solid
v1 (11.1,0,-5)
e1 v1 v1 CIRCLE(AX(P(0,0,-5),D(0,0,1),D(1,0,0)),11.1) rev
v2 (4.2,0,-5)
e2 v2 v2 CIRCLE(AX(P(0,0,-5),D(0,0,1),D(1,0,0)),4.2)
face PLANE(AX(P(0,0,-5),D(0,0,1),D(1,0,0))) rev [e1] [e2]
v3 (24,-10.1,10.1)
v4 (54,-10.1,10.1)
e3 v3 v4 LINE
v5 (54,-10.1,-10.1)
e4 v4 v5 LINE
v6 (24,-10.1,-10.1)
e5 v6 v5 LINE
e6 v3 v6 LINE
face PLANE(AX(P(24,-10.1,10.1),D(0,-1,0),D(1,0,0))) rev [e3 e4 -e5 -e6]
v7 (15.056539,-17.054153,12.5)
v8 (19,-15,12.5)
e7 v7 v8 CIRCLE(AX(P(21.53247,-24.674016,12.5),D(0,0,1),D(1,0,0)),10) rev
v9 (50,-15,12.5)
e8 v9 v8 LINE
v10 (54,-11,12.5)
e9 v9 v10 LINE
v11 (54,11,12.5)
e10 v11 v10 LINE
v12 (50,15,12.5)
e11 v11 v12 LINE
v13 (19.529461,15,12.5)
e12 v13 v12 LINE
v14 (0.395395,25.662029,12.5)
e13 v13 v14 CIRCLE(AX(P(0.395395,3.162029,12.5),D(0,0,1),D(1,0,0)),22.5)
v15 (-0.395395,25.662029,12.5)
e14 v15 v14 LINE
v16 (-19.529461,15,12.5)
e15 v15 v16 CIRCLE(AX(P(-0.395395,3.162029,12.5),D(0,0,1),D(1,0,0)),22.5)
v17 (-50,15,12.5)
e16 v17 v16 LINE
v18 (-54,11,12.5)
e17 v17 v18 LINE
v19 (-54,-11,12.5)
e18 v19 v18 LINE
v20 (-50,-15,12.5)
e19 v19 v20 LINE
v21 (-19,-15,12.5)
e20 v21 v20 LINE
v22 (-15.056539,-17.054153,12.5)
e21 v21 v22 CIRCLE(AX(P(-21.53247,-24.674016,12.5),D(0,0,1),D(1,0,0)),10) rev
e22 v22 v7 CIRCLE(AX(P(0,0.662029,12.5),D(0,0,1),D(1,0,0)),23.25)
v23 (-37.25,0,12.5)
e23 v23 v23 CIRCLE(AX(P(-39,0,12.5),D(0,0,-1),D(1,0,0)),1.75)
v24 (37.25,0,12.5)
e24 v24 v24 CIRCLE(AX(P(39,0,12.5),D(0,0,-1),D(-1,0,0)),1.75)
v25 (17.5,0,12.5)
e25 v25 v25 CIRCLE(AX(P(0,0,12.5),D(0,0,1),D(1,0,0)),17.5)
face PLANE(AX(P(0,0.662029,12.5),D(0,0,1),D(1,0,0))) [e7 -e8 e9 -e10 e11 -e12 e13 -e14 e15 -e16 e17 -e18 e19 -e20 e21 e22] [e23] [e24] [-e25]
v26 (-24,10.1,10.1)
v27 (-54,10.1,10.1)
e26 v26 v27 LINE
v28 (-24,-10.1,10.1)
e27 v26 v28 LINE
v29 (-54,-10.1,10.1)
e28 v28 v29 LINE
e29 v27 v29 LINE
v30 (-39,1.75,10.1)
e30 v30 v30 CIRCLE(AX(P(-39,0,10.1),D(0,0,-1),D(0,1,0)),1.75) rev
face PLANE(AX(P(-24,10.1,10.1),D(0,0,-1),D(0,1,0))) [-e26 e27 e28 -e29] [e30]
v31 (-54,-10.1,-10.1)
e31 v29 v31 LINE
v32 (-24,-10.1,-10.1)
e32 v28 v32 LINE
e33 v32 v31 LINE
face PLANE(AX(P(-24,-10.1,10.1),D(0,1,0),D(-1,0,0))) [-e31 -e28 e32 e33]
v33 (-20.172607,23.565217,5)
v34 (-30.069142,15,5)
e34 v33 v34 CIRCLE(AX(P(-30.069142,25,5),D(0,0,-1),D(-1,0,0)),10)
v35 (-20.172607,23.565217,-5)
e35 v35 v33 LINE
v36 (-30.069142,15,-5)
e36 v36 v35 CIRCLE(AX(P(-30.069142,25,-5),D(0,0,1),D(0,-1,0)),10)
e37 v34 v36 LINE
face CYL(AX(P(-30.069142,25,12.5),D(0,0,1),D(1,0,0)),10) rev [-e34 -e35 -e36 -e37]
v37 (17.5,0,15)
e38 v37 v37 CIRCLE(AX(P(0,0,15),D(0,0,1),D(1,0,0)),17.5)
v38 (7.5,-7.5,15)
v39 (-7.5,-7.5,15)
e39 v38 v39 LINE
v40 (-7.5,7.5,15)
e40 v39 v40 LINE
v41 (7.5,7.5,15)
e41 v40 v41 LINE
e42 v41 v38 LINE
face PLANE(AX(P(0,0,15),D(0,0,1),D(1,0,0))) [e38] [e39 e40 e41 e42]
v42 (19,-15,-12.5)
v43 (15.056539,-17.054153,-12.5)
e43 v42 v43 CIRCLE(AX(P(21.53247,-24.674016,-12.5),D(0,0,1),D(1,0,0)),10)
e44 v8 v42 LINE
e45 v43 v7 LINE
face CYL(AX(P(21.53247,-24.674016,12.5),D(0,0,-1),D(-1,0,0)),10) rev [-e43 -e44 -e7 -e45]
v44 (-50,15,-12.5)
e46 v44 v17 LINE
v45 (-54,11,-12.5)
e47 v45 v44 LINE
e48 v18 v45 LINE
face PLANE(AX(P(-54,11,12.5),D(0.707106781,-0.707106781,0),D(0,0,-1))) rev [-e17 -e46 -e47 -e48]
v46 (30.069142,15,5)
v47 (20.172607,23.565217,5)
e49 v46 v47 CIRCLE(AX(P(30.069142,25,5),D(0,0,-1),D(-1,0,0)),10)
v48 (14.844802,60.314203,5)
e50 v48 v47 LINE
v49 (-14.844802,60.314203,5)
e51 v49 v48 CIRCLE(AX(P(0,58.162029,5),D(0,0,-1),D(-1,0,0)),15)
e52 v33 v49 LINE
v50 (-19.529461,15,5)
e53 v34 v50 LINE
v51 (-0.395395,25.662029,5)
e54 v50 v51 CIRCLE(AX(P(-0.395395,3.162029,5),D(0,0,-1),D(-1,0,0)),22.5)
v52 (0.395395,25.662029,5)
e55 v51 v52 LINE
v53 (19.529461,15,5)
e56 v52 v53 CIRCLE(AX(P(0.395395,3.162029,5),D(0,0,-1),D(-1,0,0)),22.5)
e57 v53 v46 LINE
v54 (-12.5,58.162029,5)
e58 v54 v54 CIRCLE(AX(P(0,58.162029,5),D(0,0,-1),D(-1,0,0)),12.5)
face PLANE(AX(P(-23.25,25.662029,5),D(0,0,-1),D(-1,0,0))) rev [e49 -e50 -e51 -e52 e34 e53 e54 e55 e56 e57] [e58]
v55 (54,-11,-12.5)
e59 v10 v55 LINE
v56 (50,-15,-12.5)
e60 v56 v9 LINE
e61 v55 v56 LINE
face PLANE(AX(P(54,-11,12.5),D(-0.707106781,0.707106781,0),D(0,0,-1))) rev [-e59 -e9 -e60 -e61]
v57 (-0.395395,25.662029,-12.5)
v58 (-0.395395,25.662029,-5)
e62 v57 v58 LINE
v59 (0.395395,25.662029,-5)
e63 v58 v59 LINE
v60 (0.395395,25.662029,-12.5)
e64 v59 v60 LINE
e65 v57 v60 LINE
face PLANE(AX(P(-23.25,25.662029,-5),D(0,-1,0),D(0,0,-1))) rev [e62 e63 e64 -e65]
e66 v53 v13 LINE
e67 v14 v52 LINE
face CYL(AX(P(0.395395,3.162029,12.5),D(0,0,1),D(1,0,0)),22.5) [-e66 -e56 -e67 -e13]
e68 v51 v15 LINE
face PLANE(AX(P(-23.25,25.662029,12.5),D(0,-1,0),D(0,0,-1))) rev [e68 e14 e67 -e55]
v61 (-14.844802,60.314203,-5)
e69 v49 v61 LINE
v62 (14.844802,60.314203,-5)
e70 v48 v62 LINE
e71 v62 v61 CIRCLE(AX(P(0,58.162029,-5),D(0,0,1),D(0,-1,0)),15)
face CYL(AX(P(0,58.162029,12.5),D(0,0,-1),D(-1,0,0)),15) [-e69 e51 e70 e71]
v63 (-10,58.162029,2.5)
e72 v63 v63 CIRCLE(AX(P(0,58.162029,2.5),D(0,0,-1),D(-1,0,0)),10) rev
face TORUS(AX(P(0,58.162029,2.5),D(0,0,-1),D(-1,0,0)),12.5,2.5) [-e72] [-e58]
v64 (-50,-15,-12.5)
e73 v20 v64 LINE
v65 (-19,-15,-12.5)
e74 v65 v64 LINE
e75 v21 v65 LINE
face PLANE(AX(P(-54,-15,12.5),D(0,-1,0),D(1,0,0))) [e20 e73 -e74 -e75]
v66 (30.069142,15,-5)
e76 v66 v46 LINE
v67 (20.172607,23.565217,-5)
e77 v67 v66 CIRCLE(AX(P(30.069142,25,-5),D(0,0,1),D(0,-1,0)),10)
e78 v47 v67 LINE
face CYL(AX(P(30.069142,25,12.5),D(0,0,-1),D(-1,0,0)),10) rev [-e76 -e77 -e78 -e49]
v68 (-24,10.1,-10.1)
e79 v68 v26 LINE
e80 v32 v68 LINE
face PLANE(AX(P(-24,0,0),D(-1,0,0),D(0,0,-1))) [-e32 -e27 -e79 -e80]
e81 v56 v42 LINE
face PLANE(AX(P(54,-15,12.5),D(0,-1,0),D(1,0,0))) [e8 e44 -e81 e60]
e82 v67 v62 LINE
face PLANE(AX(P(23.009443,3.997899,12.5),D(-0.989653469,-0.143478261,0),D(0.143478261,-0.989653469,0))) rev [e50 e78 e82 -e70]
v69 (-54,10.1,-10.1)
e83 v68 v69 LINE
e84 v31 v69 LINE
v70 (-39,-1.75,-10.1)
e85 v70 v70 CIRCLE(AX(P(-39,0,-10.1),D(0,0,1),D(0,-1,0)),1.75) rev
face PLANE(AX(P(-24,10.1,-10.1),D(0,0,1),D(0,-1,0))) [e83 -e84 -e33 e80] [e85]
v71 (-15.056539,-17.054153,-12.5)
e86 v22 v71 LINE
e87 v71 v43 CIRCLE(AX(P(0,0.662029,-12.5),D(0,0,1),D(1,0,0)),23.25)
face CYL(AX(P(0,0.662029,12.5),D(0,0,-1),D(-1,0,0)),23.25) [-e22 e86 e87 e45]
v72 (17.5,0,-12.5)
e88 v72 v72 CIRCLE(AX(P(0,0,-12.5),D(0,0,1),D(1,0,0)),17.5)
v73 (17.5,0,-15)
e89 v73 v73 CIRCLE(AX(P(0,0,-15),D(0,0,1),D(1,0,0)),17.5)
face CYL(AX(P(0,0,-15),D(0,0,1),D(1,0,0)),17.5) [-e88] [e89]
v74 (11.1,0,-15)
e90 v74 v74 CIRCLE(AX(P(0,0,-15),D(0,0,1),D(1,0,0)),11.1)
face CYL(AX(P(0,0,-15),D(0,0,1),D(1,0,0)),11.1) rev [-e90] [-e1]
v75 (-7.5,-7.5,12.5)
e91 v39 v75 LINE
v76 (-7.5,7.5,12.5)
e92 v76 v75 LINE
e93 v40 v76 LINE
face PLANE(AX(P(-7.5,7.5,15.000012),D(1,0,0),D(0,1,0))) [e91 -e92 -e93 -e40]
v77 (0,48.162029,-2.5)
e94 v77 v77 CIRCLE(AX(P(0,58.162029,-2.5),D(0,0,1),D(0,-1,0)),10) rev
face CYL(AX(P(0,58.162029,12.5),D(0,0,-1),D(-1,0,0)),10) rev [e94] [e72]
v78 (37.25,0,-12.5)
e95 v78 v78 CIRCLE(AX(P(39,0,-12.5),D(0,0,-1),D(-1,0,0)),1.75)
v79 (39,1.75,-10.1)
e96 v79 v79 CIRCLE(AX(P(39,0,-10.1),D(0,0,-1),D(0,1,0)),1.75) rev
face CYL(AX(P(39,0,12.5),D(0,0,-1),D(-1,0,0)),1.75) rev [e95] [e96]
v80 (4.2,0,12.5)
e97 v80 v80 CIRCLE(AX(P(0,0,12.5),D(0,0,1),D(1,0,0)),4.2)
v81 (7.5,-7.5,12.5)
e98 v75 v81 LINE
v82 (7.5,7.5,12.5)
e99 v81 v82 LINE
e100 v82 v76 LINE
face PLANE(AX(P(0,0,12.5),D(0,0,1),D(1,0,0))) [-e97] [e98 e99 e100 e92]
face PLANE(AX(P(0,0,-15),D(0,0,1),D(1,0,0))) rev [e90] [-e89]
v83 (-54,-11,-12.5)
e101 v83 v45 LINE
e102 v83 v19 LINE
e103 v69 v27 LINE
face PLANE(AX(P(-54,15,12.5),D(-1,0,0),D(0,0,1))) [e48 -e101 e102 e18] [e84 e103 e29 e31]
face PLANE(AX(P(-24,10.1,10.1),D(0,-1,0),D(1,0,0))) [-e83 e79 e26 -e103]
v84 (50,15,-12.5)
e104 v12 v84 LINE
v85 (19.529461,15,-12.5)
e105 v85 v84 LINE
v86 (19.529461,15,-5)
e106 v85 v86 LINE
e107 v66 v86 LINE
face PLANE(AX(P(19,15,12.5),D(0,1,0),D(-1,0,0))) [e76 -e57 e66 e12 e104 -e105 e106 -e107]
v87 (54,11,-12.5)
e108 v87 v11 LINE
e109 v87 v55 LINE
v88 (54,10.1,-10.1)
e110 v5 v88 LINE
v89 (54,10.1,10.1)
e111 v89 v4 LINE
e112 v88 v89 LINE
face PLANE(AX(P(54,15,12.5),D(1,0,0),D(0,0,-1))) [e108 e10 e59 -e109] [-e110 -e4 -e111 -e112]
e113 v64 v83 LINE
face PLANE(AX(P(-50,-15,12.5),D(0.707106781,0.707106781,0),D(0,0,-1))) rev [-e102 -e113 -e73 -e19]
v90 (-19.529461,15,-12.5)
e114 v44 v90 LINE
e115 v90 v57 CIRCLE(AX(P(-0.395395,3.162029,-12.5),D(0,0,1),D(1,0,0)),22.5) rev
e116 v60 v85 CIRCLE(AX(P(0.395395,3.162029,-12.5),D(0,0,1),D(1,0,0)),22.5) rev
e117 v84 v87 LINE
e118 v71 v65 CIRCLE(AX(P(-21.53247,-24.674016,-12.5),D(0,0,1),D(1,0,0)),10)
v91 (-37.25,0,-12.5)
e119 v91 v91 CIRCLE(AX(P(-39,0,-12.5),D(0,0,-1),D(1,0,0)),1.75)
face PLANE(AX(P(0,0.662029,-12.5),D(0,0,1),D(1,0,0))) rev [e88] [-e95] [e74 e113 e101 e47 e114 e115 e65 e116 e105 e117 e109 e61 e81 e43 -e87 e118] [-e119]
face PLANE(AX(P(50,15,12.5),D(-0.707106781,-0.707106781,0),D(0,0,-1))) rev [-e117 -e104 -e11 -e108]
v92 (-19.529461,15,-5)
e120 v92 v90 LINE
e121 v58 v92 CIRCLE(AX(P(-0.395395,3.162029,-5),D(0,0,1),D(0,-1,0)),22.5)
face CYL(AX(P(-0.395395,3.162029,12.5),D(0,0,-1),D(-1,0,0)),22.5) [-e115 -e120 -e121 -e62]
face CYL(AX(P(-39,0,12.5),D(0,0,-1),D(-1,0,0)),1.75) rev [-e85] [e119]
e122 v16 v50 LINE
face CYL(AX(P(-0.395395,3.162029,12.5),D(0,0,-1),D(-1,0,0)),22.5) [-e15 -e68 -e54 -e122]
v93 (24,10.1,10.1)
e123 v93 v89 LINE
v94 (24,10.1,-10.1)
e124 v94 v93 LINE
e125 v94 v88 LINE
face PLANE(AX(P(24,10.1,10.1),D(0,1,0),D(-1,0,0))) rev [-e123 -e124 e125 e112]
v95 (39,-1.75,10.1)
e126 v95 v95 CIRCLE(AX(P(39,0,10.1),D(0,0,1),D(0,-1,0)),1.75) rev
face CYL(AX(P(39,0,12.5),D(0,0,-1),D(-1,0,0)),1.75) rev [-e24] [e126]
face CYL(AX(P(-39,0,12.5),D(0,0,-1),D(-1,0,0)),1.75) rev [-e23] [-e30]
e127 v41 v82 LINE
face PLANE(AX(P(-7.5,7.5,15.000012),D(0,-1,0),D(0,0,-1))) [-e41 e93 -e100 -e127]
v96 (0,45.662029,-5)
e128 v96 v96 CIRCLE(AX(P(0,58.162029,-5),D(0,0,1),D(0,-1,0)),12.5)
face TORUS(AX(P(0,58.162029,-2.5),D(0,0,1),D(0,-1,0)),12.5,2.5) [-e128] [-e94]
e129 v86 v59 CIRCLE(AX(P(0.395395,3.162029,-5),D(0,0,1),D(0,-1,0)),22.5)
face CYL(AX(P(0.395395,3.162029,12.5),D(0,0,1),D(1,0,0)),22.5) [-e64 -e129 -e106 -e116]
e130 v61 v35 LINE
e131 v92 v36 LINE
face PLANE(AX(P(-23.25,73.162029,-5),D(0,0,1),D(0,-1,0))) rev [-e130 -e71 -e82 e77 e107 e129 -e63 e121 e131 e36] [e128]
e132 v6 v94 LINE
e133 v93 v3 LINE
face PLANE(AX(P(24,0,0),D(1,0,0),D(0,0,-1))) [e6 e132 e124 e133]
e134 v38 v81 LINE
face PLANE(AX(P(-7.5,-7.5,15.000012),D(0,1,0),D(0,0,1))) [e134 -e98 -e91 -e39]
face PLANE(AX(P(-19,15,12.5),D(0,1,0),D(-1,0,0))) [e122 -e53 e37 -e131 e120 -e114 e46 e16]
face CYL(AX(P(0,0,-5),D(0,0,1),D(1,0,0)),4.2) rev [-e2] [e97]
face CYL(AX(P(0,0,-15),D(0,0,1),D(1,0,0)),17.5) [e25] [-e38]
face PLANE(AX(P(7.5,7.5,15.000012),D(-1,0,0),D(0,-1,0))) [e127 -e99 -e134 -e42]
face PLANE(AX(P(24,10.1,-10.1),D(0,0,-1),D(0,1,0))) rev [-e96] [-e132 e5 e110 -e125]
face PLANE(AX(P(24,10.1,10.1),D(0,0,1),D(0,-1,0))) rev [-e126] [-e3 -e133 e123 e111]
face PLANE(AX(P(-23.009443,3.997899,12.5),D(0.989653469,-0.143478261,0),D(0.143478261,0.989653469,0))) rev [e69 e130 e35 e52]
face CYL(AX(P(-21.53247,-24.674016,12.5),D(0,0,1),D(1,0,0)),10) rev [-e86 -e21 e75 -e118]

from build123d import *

# Parameters (mm, degrees)
CROQUIS1_R                   = 15
CROQUIS1_R_2                 = 10
SALIENTE_EXTRUIR1_DEPTH      = 12.5
CORTAR_EXTRUIR2_DEPTH        = 78.778499901
CORTAR_EXTRUIR2_DEPTH_BACK   = 78.778499901
CROQUIS3_W                   = 7.5
CROQUIS3_H                   = 47.5
REDONDEO3_R                  = 22.5
CROQUIS4_W                   = 35
CROQUIS4_H                   = 30
CROQUIS4_R                   = 1.75
SALIENTE_EXTRUIR2_DEPTH      = 25
CROQUIS5_W                   = 20.2
CROQUIS5_H                   = 20.2
CORTAR_EXTRUIR3_DEPTH        = 30
REDONDEO4_R                  = 10
CHAFL_N1_SIZE                = 4
REDONDEO6_R                  = 2.5
SALIENTE_EXTRUIR3_DEPTH      = 2.5
SALIENTE_EXTRUIR3_DEPTH_BACK = 27.5
CROQUIS6_R                   = 17.5
CROQUIS6_R_2                 = 11.1
CROQUIS8_R                   = 17.5
CROQUIS8_R_2                 = 4.2
SALIENTE_EXTRUIR4_DEPTH      = 20
CORTAR_EXTRUIR4_DEPTH        = 96.753237788
CORTAR_EXTRUIR4_DEPTH_BACK   = 2.5
CROQUIS9_W                   = 15
CROQUIS9_H                   = 15
CROQUIS9_R                   = 4.2


with BuildPart() as part:
    # Croquis1 → Saliente-Extruir1 (new, symmetric)
    with BuildSketch(Plane.XY):
        with BuildLine():
            Line((-23.009443154, 3.997898972), (-14.844802035, 60.31420332))
            ThreePointArc((-14.844802035, 60.31420332), (0, 73.162029407), (14.844802035, 60.31420332))
            Line((14.844802035, 60.31420332), (23.009443154, 3.997898972))
            ThreePointArc((23.009443154, 3.997898972), (0, -22.587970593), (-23.009443154, 3.997898972))
        make_face()
        Circle(CROQUIS1_R, mode=Mode.SUBTRACT)
        with Locations((0, 58.162029407)):
            Circle(CROQUIS1_R_2, mode=Mode.SUBTRACT)
    extrude(amount=SALIENTE_EXTRUIR1_DEPTH, both=True)

    # Croquis3 → Cortar-Extruir2 (cut, two sides: drawn at the far end of the back side and taken through both)
    with BuildSketch(Plane(origin=(0, 0, 0), x_dir=(0, 0, -1), z_dir=(1, 0, 0)).offset(-CORTAR_EXTRUIR2_DEPTH_BACK)):
        with Locations((8.75, 49.412029407)):
            Rectangle(CROQUIS3_W, CROQUIS3_H)
        with Locations((-8.75, 49.412029407)):
            Rectangle(CROQUIS3_W, CROQUIS3_H)
    extrude(amount=CORTAR_EXTRUIR2_DEPTH + CORTAR_EXTRUIR2_DEPTH_BACK, mode=Mode.SUBTRACT)

    # Redondeo3
    redondeo3_edges = [part.edges().sort_by_distance(p)[0] for p in [
        (-19.868614717, 25.662029407, 8.75),
        (-19.868614717, 25.662029407, -8.75),
        (19.868614717, 25.662029407, -8.75),
        (19.868614717, 25.662029407, 8.75),
    ]]
    fillet(redondeo3_edges, radius=REDONDEO3_R)

    # Croquis4 → Saliente-Extruir2 (add)
    # profile 1 of 2: a face of its own
    with BuildSketch(Plane(origin=(0, 0, -12.5), x_dir=(-1, 0, 0), z_dir=(0, 0, -1))):
        with Locations((-36.5, 0)):
            Rectangle(CROQUIS4_W, CROQUIS4_H)
        with Locations((-39, 0)):
            Circle(CROQUIS4_R, mode=Mode.SUBTRACT)
    # profile 2 of 2: a face of its own
    with BuildSketch(Plane(origin=(0, 0, -12.5), x_dir=(-1, 0, 0), z_dir=(0, 0, -1))):
        with Locations((36.5, 0)):
            Rectangle(CROQUIS4_W, CROQUIS4_H)
        with Locations(Location((39, 0, 0), (0, 0, 180))):
            Circle(CROQUIS4_R, mode=Mode.SUBTRACT)
    extrude(amount=-SALIENTE_EXTRUIR2_DEPTH)

    # Croquis5 → Cortar-Extruir3 (cut)
    with BuildSketch(Plane(origin=(54, 0, 0), x_dir=(0, 0, -1), z_dir=(1, 0, 0))):
        Rectangle(CROQUIS5_W, CROQUIS5_H)
    cortar_extruir3 = extrude(amount=-CORTAR_EXTRUIR3_DEPTH, mode=Mode.SUBTRACT)

    # Simetría1: Cortar-Extruir3 across plane
    add(cortar_extruir3.mirror(Plane(origin=(0, 0, 0), x_dir=(0, 0, 1), z_dir=(1, 0, 0))), mode=Mode.SUBTRACT)

    # Redondeo4
    # the kernel refuses this fillet: 10 mm, written as the material it adds along each edge
    with BuildSketch(Plane(origin=(-19, -12.738063876, -12.5), x_dir=(0.674519649650932, -0.7382568944715545, 0), z_dir=(0, 0, 1))) as redondeo4_piece_1:
        with BuildLine():
            CenterArc((7.103598198, -9.920648267), REDONDEO4_R, 97.222764243, 25.690637502)
            Line((1.669889938, -1.525720362), (0, 0))
            ThreePointArc((0, 0), (2.92316209, -0.184492778), (5.846324181, 0))
        make_face()
    extrude(amount=25)
    with BuildSketch(Plane(origin=(19, -12.738063876, -12.5), x_dir=(0, -1, 0), z_dir=(0, 0, 1))) as redondeo4_piece_2:
        with BuildLine():
            CenterArc((11.935952539, 2.532470413), REDONDEO4_R, 194.669738911, 25.690637502)
            ThreePointArc((4.316089134, -3.943460538), (2.282488571, -1.835527204), (0, 0))
            Line((0, 0), (2.261936124, 0))
        make_face()
    extrude(amount=25)
    with BuildSketch(Plane(origin=(21.414377435, 15, -5), x_dir=(1, 0, 0), z_dir=(0, 0, 1)), Plane(origin=(-21.414377435, 15, 5), x_dir=(-1, 0, 0), z_dir=(0, 0, -1))) as redondeo4_piece_3:
        with BuildLine():
            CenterArc((REDONDEO4_R * 0.865476417736, REDONDEO4_R), REDONDEO4_R, 188.249168565, 81.750831435)
            Line((-REDONDEO4_R * 0.12417705124, REDONDEO4_R * 0.85652173913), (0, 0))
            Line((0, 0), (REDONDEO4_R * 0.865476417736, 0))
        make_face()
    extrude(amount=10)

    # Chaflán1
    chafl_n1_edges = [part.edges().sort_by_distance(p)[0] for p in [
        (-54, 15, 0),
        (-54, -15, 0),
        (54, -15, 0),
        (54, 15, 0),
    ]]
    chamfer(chafl_n1_edges, length=CHAFL_N1_SIZE)

    # Redondeo6
    redondeo6_edges = [part.edges().sort_by_distance(p)[0] for p in [
        (-10, 58.162029407, -5),
        (-10, 58.162029407, 5),
    ]]
    fillet(redondeo6_edges, radius=REDONDEO6_R)

    # Croquis6 → Saliente-Extruir3 (add, two sides: drawn at the far end of the back side and taken through both)
    with BuildSketch(Plane.XY.offset(12.5).offset(-SALIENTE_EXTRUIR3_DEPTH_BACK)):
        Circle(CROQUIS6_R)
        Circle(CROQUIS6_R_2, mode=Mode.SUBTRACT)
    extrude(amount=SALIENTE_EXTRUIR3_DEPTH + SALIENTE_EXTRUIR3_DEPTH_BACK)

    # Croquis8 → Saliente-Extruir4 (add)
    with BuildSketch(Plane.XY.offset(15)):
        Circle(CROQUIS8_R)
        Circle(CROQUIS8_R_2, mode=Mode.SUBTRACT)
    extrude(amount=-SALIENTE_EXTRUIR4_DEPTH)

    # Croquis9 → Cortar-Extruir4 (cut, two sides: drawn at the far end of the back side and taken through both)
    with BuildSketch(Plane.XY.offset(15).offset(-CORTAR_EXTRUIR4_DEPTH_BACK)):
        Rectangle(CROQUIS9_W, CROQUIS9_H)
        Circle(CROQUIS9_R, mode=Mode.SUBTRACT)
    extrude(amount=CORTAR_EXTRUIR4_DEPTH + CORTAR_EXTRUIR4_DEPTH_BACK, mode=Mode.SUBTRACT)


solid = part.part
